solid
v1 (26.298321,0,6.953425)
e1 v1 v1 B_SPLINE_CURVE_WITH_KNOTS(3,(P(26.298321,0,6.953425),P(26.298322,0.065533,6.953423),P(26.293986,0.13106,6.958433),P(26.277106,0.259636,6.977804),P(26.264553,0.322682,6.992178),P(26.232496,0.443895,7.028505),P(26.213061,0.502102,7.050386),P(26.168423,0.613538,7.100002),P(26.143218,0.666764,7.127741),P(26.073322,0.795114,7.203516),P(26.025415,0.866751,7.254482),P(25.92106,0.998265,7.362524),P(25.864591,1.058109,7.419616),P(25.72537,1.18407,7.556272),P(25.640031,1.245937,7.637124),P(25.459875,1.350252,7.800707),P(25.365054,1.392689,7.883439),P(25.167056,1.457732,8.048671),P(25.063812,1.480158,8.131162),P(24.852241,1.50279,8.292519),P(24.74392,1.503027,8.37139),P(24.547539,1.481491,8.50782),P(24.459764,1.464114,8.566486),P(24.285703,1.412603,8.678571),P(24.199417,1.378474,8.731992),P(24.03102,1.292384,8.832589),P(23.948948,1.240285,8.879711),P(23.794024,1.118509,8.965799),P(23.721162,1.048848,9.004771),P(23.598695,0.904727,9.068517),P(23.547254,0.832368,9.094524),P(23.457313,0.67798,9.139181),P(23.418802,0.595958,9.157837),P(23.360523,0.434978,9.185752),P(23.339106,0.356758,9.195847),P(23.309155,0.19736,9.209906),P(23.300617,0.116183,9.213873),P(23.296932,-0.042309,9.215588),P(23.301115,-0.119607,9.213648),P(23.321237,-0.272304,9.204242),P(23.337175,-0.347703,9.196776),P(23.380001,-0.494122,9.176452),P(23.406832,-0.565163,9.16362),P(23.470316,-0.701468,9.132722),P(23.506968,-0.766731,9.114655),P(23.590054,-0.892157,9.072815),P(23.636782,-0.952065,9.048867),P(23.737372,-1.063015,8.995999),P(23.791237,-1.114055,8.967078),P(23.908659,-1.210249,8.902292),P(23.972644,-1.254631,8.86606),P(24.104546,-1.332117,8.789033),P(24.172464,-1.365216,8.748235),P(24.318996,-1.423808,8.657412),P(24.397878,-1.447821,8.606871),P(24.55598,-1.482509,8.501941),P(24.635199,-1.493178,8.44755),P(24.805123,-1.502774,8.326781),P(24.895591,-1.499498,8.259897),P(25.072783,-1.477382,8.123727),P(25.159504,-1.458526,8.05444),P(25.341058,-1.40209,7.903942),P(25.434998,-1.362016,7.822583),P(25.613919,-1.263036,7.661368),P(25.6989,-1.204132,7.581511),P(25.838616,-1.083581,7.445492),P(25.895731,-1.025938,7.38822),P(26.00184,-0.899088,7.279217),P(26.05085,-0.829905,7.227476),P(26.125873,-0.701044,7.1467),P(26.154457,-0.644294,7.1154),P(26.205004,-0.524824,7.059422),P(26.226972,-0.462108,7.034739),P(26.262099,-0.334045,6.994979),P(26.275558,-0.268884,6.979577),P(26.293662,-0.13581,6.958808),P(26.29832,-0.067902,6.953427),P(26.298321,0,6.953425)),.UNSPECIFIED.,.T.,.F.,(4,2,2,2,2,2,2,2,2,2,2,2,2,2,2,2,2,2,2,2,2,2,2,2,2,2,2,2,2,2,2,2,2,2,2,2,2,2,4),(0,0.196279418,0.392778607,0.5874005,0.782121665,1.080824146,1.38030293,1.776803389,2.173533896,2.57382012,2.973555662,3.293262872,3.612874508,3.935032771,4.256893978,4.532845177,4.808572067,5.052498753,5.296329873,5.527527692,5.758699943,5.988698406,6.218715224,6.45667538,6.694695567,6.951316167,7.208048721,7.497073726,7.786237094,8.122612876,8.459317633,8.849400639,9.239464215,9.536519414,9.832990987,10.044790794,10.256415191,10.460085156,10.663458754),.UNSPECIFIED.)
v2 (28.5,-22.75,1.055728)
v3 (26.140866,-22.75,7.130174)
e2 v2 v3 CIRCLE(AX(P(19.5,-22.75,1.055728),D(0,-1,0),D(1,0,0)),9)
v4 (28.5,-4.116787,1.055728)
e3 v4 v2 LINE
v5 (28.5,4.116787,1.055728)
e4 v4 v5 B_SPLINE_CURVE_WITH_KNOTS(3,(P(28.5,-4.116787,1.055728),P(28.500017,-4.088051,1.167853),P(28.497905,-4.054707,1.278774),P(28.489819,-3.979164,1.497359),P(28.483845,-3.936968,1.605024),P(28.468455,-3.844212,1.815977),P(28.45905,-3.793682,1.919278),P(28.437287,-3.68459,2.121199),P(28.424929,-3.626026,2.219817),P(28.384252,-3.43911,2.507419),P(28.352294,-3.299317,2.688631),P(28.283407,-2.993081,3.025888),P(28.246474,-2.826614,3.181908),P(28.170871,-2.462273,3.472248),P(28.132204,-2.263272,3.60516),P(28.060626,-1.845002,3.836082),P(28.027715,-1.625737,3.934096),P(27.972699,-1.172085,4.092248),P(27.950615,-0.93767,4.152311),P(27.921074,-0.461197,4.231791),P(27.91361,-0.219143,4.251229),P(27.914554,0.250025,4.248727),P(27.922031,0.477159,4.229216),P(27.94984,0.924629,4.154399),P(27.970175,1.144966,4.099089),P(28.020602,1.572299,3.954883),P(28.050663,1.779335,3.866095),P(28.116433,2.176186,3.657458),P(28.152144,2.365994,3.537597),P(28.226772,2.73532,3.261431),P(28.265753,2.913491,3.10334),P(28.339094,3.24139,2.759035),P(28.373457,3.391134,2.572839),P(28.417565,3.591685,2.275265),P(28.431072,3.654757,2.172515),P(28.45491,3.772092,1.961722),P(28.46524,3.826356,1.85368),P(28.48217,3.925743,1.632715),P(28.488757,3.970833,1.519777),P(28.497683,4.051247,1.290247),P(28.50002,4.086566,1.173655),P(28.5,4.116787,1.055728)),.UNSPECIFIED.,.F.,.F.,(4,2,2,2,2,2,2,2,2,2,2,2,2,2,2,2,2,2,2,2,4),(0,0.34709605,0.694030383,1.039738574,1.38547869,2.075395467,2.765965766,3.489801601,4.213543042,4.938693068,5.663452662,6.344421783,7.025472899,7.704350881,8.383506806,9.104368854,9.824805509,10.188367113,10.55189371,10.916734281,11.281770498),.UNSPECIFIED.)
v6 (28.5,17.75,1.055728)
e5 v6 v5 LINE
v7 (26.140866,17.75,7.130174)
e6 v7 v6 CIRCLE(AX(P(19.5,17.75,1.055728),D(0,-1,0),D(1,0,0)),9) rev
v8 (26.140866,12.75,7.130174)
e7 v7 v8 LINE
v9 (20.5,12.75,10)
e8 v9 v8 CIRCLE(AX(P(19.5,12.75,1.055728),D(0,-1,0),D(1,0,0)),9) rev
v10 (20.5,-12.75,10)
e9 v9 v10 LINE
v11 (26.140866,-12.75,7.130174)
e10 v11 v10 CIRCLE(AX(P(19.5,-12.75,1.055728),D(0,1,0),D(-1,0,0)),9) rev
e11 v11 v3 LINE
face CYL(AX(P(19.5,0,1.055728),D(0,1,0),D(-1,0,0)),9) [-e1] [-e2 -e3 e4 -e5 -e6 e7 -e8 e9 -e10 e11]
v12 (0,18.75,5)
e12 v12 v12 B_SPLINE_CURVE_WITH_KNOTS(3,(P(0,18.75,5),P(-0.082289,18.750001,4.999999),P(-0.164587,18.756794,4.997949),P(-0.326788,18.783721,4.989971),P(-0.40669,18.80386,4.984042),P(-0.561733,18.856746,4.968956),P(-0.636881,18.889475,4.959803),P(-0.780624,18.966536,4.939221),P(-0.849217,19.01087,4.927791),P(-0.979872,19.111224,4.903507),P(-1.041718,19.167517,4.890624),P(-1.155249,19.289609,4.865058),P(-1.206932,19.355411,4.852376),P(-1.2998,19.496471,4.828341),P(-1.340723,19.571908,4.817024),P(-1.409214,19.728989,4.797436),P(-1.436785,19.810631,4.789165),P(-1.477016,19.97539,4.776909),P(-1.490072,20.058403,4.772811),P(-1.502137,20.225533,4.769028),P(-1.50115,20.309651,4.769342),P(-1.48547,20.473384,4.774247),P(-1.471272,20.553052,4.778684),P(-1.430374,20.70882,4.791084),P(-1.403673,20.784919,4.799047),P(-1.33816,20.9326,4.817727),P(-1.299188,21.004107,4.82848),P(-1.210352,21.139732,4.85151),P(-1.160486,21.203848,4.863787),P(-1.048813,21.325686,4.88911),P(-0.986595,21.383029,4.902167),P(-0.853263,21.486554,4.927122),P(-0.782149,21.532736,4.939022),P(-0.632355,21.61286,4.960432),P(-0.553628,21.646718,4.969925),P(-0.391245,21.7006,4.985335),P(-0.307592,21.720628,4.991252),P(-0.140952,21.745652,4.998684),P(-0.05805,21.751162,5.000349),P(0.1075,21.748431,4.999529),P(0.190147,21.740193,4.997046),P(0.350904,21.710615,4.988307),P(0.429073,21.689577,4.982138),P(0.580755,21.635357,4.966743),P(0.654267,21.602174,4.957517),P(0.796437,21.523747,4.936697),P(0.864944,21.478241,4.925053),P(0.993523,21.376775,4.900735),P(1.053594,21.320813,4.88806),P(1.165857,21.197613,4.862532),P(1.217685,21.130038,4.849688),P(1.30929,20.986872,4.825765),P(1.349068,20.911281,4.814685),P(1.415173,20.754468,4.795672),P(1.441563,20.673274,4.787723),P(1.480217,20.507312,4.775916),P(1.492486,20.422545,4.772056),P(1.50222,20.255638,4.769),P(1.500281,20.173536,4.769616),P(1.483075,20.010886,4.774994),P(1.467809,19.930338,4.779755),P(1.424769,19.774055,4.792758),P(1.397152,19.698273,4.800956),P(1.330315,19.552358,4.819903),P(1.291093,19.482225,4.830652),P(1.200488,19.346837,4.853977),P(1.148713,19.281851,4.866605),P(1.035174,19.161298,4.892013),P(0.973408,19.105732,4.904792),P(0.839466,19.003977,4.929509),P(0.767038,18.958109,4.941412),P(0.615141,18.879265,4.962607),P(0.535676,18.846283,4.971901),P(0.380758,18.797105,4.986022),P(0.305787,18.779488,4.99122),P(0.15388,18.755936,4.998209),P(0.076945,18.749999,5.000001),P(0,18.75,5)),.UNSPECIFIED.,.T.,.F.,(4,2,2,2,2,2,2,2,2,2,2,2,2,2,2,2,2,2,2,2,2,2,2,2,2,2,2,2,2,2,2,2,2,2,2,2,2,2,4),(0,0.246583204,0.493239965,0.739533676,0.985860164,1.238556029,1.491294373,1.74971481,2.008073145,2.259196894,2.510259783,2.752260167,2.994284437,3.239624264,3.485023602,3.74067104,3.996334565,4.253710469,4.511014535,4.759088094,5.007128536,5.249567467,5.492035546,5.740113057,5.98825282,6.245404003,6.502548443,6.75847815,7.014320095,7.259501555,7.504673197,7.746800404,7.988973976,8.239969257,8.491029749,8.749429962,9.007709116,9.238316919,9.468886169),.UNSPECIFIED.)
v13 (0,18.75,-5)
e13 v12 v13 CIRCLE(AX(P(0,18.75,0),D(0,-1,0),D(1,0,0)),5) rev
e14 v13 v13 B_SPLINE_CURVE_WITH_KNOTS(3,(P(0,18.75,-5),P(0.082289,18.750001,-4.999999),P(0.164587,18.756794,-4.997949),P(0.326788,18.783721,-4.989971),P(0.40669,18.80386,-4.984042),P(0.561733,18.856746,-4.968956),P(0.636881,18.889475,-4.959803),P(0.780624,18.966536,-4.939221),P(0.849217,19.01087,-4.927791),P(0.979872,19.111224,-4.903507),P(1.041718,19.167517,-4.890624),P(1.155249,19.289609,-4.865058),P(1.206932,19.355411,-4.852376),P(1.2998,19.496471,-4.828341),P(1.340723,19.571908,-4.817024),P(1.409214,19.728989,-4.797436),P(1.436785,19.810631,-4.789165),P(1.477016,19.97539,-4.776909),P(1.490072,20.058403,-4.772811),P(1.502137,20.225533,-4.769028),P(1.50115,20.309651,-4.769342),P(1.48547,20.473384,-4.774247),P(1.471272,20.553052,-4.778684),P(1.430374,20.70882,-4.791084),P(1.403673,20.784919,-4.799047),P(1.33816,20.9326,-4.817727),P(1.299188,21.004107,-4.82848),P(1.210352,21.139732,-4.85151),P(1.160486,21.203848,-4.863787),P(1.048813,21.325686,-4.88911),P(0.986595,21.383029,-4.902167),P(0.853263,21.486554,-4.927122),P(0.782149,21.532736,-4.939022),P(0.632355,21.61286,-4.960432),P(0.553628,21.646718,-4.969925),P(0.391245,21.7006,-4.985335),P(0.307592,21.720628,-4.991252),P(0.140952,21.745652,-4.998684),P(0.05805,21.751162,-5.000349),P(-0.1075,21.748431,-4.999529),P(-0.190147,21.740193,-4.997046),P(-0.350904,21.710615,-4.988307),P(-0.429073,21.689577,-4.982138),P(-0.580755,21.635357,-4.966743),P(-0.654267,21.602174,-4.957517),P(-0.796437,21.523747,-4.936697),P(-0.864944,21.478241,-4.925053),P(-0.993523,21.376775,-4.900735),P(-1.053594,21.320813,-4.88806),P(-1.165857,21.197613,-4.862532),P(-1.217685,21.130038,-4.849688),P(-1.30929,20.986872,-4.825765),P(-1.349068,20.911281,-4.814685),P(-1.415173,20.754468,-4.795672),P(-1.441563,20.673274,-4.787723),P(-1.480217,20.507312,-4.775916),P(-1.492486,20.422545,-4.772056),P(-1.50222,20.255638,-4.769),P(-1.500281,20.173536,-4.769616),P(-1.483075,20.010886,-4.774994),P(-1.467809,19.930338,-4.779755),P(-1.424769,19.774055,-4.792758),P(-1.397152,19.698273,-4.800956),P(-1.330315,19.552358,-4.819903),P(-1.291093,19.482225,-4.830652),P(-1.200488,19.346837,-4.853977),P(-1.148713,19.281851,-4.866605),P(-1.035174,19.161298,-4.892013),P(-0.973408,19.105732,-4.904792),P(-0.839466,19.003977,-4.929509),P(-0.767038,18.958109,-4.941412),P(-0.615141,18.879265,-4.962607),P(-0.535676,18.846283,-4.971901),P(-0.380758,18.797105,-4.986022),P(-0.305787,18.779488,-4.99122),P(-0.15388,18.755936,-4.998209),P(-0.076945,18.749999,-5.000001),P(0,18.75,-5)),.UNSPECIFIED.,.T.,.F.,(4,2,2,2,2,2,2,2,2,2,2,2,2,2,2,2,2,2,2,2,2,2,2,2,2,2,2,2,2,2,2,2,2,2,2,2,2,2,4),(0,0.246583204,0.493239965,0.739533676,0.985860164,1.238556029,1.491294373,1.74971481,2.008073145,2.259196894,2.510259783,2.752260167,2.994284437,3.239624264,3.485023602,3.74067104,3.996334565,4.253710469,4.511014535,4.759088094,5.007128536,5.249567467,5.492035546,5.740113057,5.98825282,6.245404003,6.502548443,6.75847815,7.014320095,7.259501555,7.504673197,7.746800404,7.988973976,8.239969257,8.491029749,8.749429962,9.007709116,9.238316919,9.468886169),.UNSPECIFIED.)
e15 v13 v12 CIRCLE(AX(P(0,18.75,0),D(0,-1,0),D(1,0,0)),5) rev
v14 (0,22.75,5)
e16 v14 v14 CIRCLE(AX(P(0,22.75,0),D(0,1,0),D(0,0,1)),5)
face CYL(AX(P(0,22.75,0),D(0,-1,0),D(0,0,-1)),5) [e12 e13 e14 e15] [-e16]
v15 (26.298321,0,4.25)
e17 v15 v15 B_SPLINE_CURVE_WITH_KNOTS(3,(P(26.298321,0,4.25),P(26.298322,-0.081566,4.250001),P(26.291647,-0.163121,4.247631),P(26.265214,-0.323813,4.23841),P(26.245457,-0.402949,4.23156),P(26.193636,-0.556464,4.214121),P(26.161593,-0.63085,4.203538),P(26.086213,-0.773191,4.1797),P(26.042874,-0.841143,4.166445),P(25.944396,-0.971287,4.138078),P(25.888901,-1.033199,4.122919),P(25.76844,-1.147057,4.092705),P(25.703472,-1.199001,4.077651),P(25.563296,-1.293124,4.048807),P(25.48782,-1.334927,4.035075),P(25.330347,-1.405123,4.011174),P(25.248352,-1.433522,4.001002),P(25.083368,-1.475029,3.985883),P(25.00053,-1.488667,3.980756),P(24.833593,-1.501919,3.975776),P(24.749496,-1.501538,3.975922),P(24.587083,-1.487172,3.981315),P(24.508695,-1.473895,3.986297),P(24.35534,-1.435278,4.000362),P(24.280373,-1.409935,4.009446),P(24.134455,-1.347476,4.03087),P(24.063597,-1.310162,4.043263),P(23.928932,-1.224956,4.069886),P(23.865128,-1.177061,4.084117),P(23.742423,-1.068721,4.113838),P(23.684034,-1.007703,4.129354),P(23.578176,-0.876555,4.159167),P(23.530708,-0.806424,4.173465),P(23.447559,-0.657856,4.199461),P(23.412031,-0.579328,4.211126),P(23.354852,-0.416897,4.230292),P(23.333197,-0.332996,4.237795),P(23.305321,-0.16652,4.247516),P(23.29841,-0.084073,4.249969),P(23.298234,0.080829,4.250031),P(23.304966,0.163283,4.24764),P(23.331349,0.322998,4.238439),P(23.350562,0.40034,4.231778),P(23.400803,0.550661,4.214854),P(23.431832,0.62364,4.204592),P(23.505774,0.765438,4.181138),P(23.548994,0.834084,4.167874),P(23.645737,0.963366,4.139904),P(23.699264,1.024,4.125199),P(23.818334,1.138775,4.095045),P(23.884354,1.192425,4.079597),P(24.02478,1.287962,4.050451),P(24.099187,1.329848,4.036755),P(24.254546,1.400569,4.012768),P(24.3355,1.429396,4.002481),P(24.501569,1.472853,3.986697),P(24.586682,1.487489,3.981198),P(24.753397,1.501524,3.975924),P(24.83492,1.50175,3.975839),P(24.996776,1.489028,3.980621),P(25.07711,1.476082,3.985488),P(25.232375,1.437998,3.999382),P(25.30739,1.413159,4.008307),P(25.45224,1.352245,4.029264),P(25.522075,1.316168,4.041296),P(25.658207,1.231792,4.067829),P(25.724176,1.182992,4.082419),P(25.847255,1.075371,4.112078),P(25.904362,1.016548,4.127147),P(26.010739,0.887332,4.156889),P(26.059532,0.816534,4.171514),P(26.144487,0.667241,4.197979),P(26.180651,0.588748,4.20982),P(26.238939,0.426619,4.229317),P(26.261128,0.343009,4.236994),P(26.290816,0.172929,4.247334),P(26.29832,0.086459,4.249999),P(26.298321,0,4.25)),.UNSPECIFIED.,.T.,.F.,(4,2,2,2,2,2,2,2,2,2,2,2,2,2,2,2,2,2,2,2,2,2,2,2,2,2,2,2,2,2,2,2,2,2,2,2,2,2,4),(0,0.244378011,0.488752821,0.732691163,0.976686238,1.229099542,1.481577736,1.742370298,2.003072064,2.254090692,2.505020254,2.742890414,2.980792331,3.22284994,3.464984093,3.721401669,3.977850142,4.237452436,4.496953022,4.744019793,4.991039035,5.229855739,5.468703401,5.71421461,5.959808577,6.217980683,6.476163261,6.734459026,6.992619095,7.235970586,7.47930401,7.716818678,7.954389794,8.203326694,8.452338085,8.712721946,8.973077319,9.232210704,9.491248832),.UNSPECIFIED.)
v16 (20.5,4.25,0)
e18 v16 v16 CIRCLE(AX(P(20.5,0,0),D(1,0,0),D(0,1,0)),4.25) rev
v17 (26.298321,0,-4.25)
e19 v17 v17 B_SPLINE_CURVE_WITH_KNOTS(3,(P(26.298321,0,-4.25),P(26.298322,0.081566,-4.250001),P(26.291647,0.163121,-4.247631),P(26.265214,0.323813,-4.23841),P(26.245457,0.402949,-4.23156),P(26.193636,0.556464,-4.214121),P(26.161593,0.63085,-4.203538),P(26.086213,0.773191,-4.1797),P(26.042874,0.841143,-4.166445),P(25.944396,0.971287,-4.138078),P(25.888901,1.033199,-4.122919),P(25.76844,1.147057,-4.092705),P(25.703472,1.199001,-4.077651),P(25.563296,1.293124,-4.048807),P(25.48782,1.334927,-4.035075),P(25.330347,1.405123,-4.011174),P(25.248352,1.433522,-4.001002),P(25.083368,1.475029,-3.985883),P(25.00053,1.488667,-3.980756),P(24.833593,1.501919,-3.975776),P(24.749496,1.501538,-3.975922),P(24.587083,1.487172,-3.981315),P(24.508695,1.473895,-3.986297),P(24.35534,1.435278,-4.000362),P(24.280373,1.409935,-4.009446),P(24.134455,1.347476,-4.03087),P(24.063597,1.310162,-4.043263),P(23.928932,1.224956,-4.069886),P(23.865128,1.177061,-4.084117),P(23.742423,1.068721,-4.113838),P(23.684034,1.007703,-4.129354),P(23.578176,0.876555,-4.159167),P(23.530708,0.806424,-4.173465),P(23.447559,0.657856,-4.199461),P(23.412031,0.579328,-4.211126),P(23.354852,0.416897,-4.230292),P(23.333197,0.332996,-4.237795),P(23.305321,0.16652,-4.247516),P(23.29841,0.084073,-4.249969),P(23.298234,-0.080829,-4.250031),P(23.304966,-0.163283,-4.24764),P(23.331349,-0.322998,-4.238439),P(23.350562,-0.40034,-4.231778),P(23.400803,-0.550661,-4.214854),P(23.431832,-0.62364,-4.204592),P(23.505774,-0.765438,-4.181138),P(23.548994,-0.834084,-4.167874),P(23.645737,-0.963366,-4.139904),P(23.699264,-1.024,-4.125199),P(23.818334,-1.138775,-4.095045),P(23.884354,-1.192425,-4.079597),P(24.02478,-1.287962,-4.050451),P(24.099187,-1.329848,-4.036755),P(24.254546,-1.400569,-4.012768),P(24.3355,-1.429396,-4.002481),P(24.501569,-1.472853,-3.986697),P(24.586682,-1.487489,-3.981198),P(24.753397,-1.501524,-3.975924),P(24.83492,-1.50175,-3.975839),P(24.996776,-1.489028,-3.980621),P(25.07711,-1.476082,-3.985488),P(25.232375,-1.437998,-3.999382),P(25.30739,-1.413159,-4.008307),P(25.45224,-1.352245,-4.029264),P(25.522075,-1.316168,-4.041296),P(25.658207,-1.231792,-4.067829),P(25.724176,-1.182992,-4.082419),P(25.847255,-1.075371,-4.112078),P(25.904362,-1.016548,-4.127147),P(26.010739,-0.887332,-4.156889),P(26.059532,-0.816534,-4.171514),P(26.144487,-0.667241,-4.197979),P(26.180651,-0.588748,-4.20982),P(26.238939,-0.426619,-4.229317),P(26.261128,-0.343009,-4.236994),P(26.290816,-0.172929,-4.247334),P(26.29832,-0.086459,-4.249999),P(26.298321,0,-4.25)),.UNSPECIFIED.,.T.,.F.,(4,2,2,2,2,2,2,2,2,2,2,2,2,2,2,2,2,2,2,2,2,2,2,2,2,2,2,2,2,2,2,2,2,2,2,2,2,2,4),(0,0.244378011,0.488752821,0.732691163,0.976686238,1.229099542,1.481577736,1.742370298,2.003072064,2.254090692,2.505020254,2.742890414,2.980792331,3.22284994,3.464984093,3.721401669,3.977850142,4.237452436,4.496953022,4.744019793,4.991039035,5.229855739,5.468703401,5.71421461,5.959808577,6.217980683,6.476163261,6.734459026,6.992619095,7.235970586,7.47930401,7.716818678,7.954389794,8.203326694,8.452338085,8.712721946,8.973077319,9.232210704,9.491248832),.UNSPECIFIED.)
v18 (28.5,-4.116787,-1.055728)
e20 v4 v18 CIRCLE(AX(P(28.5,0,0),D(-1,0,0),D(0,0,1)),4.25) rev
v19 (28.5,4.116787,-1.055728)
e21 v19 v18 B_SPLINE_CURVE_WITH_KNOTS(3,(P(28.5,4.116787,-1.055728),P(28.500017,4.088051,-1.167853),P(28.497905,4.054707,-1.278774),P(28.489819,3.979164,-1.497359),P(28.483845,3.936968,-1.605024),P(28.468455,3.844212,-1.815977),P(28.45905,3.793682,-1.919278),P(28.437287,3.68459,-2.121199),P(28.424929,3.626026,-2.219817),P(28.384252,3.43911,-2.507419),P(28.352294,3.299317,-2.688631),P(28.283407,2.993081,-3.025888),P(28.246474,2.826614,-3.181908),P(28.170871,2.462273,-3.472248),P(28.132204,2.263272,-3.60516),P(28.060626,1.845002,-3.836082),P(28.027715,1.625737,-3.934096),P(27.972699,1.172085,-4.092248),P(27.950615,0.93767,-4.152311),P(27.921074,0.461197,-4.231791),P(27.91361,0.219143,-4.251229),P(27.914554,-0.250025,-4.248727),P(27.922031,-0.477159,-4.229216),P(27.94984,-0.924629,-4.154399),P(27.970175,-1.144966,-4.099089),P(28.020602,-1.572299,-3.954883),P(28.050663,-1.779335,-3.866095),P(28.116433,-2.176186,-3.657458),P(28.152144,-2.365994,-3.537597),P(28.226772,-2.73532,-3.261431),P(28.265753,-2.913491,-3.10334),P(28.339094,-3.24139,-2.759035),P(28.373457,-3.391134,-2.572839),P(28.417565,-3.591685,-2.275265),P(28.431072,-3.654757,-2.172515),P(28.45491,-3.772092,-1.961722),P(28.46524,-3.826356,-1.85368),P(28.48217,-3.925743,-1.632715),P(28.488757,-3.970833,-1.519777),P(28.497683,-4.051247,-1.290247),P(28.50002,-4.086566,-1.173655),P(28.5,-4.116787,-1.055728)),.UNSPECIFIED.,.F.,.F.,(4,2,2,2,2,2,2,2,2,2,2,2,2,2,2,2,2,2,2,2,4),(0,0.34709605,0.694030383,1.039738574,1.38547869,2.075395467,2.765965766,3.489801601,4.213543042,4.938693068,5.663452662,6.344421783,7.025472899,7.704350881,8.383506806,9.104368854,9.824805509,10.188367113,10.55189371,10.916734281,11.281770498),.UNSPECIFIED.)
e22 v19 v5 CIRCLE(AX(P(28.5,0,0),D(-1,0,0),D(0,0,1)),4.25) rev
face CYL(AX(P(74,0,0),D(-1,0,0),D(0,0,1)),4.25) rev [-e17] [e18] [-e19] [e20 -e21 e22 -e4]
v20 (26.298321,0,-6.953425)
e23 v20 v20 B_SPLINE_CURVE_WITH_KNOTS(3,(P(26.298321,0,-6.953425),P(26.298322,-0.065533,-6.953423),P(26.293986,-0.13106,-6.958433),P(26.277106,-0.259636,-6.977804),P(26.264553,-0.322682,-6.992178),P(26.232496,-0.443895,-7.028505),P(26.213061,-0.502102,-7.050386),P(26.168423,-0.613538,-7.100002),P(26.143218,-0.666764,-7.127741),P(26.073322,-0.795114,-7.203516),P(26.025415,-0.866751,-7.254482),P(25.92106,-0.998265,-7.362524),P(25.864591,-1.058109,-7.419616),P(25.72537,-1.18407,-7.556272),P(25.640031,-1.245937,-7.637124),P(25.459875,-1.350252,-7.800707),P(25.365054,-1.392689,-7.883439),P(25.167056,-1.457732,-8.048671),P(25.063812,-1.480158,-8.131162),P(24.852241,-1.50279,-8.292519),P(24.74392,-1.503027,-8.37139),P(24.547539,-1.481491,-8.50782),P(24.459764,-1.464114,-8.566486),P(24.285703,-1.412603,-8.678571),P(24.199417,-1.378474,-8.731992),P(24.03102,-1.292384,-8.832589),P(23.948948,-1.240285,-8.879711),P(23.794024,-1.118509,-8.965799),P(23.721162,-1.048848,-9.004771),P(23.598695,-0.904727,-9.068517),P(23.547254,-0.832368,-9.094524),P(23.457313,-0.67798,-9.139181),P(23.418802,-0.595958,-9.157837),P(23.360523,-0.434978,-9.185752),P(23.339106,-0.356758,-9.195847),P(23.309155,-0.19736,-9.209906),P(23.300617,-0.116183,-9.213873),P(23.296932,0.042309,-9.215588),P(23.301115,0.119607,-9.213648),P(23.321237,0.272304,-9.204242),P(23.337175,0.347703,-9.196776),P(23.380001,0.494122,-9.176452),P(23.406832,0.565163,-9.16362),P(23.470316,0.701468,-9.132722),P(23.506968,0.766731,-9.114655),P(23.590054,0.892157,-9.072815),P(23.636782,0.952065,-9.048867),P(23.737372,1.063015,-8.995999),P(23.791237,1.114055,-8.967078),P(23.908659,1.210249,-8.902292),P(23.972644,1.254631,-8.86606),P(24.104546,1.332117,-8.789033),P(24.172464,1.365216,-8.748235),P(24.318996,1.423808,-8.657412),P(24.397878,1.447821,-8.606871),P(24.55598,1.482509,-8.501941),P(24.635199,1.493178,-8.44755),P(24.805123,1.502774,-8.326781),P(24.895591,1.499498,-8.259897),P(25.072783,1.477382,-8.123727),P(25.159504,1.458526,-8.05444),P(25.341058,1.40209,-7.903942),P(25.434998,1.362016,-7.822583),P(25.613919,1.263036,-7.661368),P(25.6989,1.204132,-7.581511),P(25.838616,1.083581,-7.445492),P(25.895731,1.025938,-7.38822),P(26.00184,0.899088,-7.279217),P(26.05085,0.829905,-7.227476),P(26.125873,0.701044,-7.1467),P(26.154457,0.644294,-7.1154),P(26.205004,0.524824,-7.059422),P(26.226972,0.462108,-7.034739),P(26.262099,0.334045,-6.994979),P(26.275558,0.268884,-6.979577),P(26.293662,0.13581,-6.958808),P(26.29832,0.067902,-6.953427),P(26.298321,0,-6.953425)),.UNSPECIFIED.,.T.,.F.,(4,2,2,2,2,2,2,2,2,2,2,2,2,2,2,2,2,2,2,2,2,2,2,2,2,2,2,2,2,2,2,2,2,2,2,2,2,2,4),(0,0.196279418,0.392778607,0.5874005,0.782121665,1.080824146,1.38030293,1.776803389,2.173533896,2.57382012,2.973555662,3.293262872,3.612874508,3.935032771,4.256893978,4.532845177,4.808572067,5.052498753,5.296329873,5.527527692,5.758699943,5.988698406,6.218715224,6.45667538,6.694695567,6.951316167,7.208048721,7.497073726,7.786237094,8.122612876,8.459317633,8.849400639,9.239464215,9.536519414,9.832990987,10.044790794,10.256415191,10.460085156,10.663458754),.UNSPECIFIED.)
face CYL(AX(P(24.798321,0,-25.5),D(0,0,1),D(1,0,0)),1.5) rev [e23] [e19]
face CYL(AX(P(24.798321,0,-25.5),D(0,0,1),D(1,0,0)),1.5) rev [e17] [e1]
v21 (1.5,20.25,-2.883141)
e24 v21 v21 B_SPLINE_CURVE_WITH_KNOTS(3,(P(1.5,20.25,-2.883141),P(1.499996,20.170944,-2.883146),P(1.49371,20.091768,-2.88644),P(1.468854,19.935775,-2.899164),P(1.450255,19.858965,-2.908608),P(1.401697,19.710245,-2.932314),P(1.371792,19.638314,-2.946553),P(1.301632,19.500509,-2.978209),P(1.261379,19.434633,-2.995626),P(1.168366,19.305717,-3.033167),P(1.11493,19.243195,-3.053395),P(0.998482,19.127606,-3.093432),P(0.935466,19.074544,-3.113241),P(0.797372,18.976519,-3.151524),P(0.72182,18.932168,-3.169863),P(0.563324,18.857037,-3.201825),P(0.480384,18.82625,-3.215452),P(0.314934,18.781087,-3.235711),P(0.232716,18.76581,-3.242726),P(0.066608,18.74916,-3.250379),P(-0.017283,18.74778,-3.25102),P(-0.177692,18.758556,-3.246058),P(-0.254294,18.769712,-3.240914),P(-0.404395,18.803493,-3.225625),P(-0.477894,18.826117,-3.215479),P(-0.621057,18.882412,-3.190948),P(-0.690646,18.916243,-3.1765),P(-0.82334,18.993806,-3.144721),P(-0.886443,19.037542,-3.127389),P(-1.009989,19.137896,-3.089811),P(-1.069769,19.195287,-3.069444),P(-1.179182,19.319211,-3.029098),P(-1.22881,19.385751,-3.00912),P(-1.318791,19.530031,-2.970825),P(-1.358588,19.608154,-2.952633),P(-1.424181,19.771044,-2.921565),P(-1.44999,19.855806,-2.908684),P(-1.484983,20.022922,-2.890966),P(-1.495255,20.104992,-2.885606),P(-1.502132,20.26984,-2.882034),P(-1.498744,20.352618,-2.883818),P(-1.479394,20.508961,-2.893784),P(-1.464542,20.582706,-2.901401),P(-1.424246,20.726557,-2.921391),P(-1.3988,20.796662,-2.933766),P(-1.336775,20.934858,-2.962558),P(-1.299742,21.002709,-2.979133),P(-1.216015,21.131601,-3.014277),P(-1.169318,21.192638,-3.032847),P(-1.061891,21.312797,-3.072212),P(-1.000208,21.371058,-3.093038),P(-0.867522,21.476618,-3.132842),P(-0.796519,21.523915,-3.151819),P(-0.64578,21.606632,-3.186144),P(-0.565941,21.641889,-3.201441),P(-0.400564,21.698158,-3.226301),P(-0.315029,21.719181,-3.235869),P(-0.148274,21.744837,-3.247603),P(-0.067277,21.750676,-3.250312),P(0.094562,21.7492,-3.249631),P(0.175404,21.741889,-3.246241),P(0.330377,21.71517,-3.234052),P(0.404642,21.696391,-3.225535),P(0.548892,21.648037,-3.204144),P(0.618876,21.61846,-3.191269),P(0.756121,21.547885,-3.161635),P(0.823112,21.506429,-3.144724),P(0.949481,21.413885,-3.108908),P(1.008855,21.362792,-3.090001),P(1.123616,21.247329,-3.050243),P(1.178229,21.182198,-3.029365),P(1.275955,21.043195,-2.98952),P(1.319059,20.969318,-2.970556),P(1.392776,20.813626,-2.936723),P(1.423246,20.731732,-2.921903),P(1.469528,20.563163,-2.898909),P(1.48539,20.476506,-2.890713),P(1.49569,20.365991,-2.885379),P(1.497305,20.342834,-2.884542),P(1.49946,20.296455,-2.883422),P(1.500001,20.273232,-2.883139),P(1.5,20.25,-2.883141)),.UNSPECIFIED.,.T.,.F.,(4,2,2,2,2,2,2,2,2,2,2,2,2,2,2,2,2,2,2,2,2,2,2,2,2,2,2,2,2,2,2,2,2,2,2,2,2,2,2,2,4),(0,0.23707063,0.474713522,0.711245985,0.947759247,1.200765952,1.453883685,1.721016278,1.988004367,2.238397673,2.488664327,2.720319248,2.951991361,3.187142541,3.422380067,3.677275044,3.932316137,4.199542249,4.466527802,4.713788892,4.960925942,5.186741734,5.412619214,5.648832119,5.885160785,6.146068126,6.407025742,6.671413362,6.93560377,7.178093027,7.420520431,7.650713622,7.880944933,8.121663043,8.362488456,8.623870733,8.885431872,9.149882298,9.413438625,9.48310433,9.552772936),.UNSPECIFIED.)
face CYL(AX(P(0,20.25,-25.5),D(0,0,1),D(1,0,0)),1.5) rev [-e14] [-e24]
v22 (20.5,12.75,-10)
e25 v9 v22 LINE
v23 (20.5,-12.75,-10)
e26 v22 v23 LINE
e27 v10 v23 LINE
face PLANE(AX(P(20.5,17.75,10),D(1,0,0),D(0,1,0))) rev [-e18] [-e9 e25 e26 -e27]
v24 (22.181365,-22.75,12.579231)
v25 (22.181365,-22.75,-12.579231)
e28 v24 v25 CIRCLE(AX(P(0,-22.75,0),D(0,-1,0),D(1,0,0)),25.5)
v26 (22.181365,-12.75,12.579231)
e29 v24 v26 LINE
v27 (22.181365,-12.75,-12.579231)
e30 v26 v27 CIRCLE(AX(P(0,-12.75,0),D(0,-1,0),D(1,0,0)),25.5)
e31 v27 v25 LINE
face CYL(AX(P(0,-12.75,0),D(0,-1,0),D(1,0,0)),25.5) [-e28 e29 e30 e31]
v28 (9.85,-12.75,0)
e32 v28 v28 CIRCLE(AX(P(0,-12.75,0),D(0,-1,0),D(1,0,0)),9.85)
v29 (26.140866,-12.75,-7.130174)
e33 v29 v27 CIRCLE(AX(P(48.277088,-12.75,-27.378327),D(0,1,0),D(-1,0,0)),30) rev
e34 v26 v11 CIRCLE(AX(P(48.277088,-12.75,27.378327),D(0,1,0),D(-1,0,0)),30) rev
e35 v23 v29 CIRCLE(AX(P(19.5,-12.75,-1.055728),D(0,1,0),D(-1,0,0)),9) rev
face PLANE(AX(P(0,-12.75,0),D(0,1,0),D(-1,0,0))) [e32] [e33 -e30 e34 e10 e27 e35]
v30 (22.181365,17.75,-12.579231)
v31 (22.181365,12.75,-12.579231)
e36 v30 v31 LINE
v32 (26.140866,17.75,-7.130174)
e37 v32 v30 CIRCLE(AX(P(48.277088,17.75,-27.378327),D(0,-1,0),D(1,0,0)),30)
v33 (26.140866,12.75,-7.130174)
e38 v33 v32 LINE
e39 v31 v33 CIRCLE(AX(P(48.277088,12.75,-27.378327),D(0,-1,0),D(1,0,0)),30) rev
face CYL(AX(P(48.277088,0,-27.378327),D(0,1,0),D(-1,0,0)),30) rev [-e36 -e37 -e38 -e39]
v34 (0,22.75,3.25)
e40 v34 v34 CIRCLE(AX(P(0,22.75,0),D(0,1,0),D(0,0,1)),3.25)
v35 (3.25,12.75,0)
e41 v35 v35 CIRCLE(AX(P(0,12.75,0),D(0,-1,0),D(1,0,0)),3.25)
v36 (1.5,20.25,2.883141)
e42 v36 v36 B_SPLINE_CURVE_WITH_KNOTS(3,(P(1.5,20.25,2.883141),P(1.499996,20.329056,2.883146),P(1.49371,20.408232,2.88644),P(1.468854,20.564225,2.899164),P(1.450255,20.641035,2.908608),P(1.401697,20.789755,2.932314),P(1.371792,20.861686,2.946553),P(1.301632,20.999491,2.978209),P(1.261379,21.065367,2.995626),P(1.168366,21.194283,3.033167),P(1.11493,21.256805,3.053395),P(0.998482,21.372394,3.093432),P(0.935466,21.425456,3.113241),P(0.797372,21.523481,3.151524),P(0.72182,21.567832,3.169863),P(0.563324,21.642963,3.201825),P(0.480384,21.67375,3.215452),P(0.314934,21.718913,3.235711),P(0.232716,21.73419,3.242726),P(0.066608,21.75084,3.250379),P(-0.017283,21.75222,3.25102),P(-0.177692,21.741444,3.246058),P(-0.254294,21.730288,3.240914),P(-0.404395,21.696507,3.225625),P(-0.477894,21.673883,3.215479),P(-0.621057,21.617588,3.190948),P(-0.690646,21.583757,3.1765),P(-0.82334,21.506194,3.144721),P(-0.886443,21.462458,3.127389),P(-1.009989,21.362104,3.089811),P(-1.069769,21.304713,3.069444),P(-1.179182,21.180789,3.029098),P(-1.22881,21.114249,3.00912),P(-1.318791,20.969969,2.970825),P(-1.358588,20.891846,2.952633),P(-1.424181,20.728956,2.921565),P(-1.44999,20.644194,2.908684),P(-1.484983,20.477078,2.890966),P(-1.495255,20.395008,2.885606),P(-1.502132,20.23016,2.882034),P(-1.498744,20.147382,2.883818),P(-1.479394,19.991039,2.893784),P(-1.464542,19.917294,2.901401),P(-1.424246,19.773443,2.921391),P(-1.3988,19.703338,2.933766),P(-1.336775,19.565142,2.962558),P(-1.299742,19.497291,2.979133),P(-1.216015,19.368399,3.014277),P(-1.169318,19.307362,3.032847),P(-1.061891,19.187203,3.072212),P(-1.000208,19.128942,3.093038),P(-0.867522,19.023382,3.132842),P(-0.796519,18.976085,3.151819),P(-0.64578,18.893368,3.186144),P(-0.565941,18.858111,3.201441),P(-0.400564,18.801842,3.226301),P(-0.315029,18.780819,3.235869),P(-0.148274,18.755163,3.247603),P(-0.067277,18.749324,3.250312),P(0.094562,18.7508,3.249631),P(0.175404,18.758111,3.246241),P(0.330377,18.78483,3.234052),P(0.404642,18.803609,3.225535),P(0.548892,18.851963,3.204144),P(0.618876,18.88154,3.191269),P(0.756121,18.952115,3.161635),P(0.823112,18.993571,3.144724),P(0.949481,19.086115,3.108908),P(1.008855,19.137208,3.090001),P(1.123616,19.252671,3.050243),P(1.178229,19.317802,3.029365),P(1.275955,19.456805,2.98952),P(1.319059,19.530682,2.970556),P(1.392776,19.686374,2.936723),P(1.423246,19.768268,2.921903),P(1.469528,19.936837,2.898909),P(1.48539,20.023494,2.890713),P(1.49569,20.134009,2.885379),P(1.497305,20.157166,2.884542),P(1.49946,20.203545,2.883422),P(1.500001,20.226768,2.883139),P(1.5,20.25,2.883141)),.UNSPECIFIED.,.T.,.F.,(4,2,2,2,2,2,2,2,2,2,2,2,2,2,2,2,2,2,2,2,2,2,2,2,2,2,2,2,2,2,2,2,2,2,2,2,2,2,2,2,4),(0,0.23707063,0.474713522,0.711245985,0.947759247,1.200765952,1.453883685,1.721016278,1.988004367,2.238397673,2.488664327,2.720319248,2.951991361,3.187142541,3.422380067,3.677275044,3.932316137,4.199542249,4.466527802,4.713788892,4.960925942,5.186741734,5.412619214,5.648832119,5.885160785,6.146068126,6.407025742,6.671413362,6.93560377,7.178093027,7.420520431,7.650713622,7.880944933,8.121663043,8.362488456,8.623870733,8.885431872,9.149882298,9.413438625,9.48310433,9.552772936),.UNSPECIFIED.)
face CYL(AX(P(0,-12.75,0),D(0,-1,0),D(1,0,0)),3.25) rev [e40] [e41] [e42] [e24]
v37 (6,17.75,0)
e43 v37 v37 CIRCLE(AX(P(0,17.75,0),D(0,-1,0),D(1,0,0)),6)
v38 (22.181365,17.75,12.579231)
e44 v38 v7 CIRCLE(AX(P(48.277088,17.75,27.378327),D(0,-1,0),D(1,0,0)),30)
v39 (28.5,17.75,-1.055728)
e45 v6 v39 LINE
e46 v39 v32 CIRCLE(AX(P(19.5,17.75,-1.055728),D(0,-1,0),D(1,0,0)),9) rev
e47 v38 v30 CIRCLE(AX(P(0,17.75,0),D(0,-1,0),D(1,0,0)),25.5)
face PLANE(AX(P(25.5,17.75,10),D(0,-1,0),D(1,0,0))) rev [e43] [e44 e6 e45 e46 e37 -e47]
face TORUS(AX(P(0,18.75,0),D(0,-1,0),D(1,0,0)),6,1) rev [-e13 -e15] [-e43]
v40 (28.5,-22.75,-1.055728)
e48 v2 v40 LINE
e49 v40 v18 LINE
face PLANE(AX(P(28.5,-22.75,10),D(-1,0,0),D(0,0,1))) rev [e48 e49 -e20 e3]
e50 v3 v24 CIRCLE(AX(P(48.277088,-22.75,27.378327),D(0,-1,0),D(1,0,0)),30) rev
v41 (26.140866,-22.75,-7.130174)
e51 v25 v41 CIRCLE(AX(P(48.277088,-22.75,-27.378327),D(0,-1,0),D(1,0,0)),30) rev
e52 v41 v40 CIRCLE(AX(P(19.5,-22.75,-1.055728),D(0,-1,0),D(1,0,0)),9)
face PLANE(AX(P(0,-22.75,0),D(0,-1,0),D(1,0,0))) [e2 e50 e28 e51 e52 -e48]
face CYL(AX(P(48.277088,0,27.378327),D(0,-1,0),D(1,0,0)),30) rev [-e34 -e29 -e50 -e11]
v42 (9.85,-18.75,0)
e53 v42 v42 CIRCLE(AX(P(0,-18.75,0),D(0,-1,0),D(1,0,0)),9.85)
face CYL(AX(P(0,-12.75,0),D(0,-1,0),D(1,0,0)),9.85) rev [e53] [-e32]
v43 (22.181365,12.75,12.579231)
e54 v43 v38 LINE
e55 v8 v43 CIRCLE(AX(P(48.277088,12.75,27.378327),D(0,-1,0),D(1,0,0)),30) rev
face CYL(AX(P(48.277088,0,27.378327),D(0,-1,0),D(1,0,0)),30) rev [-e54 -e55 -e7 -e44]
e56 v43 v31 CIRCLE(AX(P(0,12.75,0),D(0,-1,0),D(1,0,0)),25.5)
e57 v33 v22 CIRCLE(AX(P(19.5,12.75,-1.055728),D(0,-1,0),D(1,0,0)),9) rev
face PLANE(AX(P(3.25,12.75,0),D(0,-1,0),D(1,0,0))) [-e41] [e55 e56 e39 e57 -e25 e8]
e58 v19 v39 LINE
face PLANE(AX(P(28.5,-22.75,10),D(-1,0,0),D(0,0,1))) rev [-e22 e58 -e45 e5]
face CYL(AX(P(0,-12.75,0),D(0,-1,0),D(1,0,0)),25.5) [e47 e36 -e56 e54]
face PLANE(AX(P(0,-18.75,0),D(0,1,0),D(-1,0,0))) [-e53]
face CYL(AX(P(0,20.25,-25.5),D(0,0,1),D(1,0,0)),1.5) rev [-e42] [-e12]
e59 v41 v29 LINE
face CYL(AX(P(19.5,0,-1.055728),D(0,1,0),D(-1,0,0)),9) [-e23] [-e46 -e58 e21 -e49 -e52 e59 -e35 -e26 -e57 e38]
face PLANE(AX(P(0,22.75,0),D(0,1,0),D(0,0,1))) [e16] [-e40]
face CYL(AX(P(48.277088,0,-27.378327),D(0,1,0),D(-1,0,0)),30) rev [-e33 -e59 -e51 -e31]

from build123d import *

# Parameters (mm, degrees)
SKETCH1_W               = 22.25
SKETCH1_H               = 5
BOSS_EXTRUDE1_DEPTH     = 10
FILLET2_R               = 9
FILLET4_R               = 30
SKETCH4_R               = 4.25
CUT_EXTRUDE1_DEPTH      = 74
CUT_EXTRUDE3_DEPTH      = 45.497893381
CUT_EXTRUDE3_DEPTH_BACK = 45.497893381
SKETCH6_R               = 1.5
SKETCH7_R               = 5
SKETCH7_R_2             = 3.25
BOSS_EXTRUDE2_DEPTH     = 5
FILLET6_R               = 1
CUT_EXTRUDE4_DEPTH      = 45.497893381
CUT_EXTRUDE4_DEPTH_BACK = 45.497893381
SKETCH8_R               = 1.5


with BuildPart() as part:
    # Sketch1 → Revolve1 (revolve)
    with BuildSketch(Plane.XY):
        Polygon((25.5, -22.75), (25.5, -12.75), (9.85, -12.75), (9.85, -18.75), (0, -18.75), (0, -22.75), align=None)
        with Locations((14.375, 15.25)):
            Rectangle(SKETCH1_W, SKETCH1_H)
    revolve(axis=Axis((0, -12.75, 0), (0, 1, 0)))


with BuildPart() as body_2:
    # Sketch2 → Boss-Extrude1 (new, symmetric)
    with BuildSketch(Plane.XY):
        Polygon((25.5, -22.75), (28.5, -22.75), (28.5, 17.75), (25.5, 17.75), (20.5, 17.75), (20.5, -22.75), align=None)
    extrude(amount=BOSS_EXTRUDE1_DEPTH, both=True)


with BuildPart() as part_1:
    add(part.part)

    # Intersect2: read off the stored shape, not the designer's step
    # Intersect2: union body 2
    add(body_2.part)

    # Fillet2
    # the kernel refuses this fillet: 9 mm, written as the material it takes off along each edge
    with BuildSketch(Plane(origin=(28.5, -45.110679775, -10), x_dir=(-1, 0, 0), z_dir=(0, 1, 0))) as fillet2_piece_1_section:
        with BuildLine():
            CenterArc((9, 8.94427191), FILLET2_R, 180, 83.620629792)
            Line((0, 8.94427191), (0, 0))
            Line((0, 0), (8, 0))
        make_face()
    fillet2_piece_1 = extrude(amount=85.22135955, mode=Mode.PRIVATE)
    fillet2_piece_1 = fillet2_piece_1 - Plane(origin=(0, -45.110679775, 0), x_dir=(1, 0, 0), z_dir=(0, 1, 0)) * Cylinder(25.5, 207, mode=Mode.PRIVATE)
    add(fillet2_piece_1, mode=Mode.SUBTRACT)
    with BuildSketch(Plane(origin=(28.5, -45.110679775, -10), x_dir=(-1, 0, 0), z_dir=(0, 1, 0))) as fillet2_piece_2_section:
        with BuildLine():
            CenterArc((9, 8.94427191), FILLET2_R, 180, 83.620629792)
            Line((0, 8.94427191), (0, 0))
            Line((0, 0), (8, 0))
        make_face()
    fillet2_piece_2 = extrude(amount=85.22135955, mode=Mode.PRIVATE)
    fillet2_piece_2 = split(fillet2_piece_2, bisect_by=Plane(origin=(28.5, -12.75, -10), z_dir=(0, 1, 0)), keep=Keep.TOP, mode=Mode.PRIVATE)
    fillet2_piece_2 = split(fillet2_piece_2, bisect_by=Plane(origin=(28.5, 12.75, -10), z_dir=(0, -1, 0)), keep=Keep.TOP, mode=Mode.PRIVATE)
    add(fillet2_piece_2, mode=Mode.SUBTRACT)
    with BuildSketch(Plane(origin=(28.5, -45.110679775, 10), x_dir=(-1, 0, 0), z_dir=(0, 1, 0))) as fillet2_piece_3_section:
        with BuildLine():
            CenterArc((9, -8.94427191), FILLET2_R, 96.379370208, 83.620629792)
            Line((0, -8.94427191), (0, 0))
            Line((0, 0), (8, 0))
        make_face()
    fillet2_piece_3 = extrude(amount=85.22135955, mode=Mode.PRIVATE)
    fillet2_piece_3 = fillet2_piece_3 - Plane(origin=(0, -45.110679775, 0), x_dir=(1, 0, 0), z_dir=(0, 1, 0)) * Cylinder(25.5, 207, mode=Mode.PRIVATE)
    add(fillet2_piece_3, mode=Mode.SUBTRACT)
    with BuildSketch(Plane(origin=(28.5, -45.110679775, 10), x_dir=(-1, 0, 0), z_dir=(0, 1, 0))) as fillet2_piece_4_section:
        with BuildLine():
            CenterArc((9, -8.94427191), FILLET2_R, 96.379370208, 83.620629792)
            Line((0, -8.94427191), (0, 0))
            Line((0, 0), (8, 0))
        make_face()
    fillet2_piece_4 = extrude(amount=85.22135955, mode=Mode.PRIVATE)
    fillet2_piece_4 = split(fillet2_piece_4, bisect_by=Plane(origin=(28.5, -12.75, 10), z_dir=(0, 1, 0)), keep=Keep.TOP, mode=Mode.PRIVATE)
    fillet2_piece_4 = split(fillet2_piece_4, bisect_by=Plane(origin=(28.5, 12.75, 10), z_dir=(0, -1, 0)), keep=Keep.TOP, mode=Mode.PRIVATE)
    add(fillet2_piece_4, mode=Mode.SUBTRACT)

    # Fillet4
    fillet4_edges = [part_1.edges().sort_by_distance(p)[0] for p in [
        (23.892282884, 15.25, -8.911162582),
        (23.892282884, -17.75, -8.911162582),
        (23.892282884, 15.25, 8.911162582),
        (23.892282884, -17.75, 8.911162582),
    ]]
    fillet(fillet4_edges, radius=FILLET4_R)

    # Sketch4 → Cut-Extrude1 (cut)
    with BuildSketch(Plane(origin=(0, 0, 0), x_dir=(0, 0, -1), z_dir=(1, 0, 0))):
        with Locations(Location((0, 0, 0), (0, 0, 255.616756445))):
            Circle(SKETCH4_R)
    extrude(amount=CUT_EXTRUDE1_DEPTH, mode=Mode.SUBTRACT)

    # Sketch6 → Cut-Extrude3 (cut, two sides: drawn at the far end of the back side and taken through both)
    with BuildSketch(Plane.XY.offset(-CUT_EXTRUDE3_DEPTH_BACK)):
        with Locations((24.798321038, 0)):
            Circle(SKETCH6_R)
    extrude(amount=CUT_EXTRUDE3_DEPTH + CUT_EXTRUDE3_DEPTH_BACK, mode=Mode.SUBTRACT)

    # Sketch7 → Boss-Extrude2 (add)
    with BuildSketch(Plane(origin=(0, 17.75, 0), x_dir=(1, 0, 0), z_dir=(0, 1, 0))):
        Circle(SKETCH7_R)
        Circle(SKETCH7_R_2, mode=Mode.SUBTRACT)
    extrude(amount=BOSS_EXTRUDE2_DEPTH)

    # Fillet6
    fillet6_edges = [part_1.edges().sort_by_distance(p)[0] for p in [
        (-5, 17.75, 0),
    ]]
    fillet(fillet6_edges, radius=FILLET6_R)

    # Sketch8 → Cut-Extrude4 (cut, two sides: drawn at the far end of the back side and taken through both)
    with BuildSketch(Plane.XY.offset(-CUT_EXTRUDE4_DEPTH_BACK)):
        with Locations((0, 20.25)):
            Circle(SKETCH8_R)
    extrude(amount=CUT_EXTRUDE4_DEPTH + CUT_EXTRUDE4_DEPTH_BACK, mode=Mode.SUBTRACT)


solid = part_1.part
